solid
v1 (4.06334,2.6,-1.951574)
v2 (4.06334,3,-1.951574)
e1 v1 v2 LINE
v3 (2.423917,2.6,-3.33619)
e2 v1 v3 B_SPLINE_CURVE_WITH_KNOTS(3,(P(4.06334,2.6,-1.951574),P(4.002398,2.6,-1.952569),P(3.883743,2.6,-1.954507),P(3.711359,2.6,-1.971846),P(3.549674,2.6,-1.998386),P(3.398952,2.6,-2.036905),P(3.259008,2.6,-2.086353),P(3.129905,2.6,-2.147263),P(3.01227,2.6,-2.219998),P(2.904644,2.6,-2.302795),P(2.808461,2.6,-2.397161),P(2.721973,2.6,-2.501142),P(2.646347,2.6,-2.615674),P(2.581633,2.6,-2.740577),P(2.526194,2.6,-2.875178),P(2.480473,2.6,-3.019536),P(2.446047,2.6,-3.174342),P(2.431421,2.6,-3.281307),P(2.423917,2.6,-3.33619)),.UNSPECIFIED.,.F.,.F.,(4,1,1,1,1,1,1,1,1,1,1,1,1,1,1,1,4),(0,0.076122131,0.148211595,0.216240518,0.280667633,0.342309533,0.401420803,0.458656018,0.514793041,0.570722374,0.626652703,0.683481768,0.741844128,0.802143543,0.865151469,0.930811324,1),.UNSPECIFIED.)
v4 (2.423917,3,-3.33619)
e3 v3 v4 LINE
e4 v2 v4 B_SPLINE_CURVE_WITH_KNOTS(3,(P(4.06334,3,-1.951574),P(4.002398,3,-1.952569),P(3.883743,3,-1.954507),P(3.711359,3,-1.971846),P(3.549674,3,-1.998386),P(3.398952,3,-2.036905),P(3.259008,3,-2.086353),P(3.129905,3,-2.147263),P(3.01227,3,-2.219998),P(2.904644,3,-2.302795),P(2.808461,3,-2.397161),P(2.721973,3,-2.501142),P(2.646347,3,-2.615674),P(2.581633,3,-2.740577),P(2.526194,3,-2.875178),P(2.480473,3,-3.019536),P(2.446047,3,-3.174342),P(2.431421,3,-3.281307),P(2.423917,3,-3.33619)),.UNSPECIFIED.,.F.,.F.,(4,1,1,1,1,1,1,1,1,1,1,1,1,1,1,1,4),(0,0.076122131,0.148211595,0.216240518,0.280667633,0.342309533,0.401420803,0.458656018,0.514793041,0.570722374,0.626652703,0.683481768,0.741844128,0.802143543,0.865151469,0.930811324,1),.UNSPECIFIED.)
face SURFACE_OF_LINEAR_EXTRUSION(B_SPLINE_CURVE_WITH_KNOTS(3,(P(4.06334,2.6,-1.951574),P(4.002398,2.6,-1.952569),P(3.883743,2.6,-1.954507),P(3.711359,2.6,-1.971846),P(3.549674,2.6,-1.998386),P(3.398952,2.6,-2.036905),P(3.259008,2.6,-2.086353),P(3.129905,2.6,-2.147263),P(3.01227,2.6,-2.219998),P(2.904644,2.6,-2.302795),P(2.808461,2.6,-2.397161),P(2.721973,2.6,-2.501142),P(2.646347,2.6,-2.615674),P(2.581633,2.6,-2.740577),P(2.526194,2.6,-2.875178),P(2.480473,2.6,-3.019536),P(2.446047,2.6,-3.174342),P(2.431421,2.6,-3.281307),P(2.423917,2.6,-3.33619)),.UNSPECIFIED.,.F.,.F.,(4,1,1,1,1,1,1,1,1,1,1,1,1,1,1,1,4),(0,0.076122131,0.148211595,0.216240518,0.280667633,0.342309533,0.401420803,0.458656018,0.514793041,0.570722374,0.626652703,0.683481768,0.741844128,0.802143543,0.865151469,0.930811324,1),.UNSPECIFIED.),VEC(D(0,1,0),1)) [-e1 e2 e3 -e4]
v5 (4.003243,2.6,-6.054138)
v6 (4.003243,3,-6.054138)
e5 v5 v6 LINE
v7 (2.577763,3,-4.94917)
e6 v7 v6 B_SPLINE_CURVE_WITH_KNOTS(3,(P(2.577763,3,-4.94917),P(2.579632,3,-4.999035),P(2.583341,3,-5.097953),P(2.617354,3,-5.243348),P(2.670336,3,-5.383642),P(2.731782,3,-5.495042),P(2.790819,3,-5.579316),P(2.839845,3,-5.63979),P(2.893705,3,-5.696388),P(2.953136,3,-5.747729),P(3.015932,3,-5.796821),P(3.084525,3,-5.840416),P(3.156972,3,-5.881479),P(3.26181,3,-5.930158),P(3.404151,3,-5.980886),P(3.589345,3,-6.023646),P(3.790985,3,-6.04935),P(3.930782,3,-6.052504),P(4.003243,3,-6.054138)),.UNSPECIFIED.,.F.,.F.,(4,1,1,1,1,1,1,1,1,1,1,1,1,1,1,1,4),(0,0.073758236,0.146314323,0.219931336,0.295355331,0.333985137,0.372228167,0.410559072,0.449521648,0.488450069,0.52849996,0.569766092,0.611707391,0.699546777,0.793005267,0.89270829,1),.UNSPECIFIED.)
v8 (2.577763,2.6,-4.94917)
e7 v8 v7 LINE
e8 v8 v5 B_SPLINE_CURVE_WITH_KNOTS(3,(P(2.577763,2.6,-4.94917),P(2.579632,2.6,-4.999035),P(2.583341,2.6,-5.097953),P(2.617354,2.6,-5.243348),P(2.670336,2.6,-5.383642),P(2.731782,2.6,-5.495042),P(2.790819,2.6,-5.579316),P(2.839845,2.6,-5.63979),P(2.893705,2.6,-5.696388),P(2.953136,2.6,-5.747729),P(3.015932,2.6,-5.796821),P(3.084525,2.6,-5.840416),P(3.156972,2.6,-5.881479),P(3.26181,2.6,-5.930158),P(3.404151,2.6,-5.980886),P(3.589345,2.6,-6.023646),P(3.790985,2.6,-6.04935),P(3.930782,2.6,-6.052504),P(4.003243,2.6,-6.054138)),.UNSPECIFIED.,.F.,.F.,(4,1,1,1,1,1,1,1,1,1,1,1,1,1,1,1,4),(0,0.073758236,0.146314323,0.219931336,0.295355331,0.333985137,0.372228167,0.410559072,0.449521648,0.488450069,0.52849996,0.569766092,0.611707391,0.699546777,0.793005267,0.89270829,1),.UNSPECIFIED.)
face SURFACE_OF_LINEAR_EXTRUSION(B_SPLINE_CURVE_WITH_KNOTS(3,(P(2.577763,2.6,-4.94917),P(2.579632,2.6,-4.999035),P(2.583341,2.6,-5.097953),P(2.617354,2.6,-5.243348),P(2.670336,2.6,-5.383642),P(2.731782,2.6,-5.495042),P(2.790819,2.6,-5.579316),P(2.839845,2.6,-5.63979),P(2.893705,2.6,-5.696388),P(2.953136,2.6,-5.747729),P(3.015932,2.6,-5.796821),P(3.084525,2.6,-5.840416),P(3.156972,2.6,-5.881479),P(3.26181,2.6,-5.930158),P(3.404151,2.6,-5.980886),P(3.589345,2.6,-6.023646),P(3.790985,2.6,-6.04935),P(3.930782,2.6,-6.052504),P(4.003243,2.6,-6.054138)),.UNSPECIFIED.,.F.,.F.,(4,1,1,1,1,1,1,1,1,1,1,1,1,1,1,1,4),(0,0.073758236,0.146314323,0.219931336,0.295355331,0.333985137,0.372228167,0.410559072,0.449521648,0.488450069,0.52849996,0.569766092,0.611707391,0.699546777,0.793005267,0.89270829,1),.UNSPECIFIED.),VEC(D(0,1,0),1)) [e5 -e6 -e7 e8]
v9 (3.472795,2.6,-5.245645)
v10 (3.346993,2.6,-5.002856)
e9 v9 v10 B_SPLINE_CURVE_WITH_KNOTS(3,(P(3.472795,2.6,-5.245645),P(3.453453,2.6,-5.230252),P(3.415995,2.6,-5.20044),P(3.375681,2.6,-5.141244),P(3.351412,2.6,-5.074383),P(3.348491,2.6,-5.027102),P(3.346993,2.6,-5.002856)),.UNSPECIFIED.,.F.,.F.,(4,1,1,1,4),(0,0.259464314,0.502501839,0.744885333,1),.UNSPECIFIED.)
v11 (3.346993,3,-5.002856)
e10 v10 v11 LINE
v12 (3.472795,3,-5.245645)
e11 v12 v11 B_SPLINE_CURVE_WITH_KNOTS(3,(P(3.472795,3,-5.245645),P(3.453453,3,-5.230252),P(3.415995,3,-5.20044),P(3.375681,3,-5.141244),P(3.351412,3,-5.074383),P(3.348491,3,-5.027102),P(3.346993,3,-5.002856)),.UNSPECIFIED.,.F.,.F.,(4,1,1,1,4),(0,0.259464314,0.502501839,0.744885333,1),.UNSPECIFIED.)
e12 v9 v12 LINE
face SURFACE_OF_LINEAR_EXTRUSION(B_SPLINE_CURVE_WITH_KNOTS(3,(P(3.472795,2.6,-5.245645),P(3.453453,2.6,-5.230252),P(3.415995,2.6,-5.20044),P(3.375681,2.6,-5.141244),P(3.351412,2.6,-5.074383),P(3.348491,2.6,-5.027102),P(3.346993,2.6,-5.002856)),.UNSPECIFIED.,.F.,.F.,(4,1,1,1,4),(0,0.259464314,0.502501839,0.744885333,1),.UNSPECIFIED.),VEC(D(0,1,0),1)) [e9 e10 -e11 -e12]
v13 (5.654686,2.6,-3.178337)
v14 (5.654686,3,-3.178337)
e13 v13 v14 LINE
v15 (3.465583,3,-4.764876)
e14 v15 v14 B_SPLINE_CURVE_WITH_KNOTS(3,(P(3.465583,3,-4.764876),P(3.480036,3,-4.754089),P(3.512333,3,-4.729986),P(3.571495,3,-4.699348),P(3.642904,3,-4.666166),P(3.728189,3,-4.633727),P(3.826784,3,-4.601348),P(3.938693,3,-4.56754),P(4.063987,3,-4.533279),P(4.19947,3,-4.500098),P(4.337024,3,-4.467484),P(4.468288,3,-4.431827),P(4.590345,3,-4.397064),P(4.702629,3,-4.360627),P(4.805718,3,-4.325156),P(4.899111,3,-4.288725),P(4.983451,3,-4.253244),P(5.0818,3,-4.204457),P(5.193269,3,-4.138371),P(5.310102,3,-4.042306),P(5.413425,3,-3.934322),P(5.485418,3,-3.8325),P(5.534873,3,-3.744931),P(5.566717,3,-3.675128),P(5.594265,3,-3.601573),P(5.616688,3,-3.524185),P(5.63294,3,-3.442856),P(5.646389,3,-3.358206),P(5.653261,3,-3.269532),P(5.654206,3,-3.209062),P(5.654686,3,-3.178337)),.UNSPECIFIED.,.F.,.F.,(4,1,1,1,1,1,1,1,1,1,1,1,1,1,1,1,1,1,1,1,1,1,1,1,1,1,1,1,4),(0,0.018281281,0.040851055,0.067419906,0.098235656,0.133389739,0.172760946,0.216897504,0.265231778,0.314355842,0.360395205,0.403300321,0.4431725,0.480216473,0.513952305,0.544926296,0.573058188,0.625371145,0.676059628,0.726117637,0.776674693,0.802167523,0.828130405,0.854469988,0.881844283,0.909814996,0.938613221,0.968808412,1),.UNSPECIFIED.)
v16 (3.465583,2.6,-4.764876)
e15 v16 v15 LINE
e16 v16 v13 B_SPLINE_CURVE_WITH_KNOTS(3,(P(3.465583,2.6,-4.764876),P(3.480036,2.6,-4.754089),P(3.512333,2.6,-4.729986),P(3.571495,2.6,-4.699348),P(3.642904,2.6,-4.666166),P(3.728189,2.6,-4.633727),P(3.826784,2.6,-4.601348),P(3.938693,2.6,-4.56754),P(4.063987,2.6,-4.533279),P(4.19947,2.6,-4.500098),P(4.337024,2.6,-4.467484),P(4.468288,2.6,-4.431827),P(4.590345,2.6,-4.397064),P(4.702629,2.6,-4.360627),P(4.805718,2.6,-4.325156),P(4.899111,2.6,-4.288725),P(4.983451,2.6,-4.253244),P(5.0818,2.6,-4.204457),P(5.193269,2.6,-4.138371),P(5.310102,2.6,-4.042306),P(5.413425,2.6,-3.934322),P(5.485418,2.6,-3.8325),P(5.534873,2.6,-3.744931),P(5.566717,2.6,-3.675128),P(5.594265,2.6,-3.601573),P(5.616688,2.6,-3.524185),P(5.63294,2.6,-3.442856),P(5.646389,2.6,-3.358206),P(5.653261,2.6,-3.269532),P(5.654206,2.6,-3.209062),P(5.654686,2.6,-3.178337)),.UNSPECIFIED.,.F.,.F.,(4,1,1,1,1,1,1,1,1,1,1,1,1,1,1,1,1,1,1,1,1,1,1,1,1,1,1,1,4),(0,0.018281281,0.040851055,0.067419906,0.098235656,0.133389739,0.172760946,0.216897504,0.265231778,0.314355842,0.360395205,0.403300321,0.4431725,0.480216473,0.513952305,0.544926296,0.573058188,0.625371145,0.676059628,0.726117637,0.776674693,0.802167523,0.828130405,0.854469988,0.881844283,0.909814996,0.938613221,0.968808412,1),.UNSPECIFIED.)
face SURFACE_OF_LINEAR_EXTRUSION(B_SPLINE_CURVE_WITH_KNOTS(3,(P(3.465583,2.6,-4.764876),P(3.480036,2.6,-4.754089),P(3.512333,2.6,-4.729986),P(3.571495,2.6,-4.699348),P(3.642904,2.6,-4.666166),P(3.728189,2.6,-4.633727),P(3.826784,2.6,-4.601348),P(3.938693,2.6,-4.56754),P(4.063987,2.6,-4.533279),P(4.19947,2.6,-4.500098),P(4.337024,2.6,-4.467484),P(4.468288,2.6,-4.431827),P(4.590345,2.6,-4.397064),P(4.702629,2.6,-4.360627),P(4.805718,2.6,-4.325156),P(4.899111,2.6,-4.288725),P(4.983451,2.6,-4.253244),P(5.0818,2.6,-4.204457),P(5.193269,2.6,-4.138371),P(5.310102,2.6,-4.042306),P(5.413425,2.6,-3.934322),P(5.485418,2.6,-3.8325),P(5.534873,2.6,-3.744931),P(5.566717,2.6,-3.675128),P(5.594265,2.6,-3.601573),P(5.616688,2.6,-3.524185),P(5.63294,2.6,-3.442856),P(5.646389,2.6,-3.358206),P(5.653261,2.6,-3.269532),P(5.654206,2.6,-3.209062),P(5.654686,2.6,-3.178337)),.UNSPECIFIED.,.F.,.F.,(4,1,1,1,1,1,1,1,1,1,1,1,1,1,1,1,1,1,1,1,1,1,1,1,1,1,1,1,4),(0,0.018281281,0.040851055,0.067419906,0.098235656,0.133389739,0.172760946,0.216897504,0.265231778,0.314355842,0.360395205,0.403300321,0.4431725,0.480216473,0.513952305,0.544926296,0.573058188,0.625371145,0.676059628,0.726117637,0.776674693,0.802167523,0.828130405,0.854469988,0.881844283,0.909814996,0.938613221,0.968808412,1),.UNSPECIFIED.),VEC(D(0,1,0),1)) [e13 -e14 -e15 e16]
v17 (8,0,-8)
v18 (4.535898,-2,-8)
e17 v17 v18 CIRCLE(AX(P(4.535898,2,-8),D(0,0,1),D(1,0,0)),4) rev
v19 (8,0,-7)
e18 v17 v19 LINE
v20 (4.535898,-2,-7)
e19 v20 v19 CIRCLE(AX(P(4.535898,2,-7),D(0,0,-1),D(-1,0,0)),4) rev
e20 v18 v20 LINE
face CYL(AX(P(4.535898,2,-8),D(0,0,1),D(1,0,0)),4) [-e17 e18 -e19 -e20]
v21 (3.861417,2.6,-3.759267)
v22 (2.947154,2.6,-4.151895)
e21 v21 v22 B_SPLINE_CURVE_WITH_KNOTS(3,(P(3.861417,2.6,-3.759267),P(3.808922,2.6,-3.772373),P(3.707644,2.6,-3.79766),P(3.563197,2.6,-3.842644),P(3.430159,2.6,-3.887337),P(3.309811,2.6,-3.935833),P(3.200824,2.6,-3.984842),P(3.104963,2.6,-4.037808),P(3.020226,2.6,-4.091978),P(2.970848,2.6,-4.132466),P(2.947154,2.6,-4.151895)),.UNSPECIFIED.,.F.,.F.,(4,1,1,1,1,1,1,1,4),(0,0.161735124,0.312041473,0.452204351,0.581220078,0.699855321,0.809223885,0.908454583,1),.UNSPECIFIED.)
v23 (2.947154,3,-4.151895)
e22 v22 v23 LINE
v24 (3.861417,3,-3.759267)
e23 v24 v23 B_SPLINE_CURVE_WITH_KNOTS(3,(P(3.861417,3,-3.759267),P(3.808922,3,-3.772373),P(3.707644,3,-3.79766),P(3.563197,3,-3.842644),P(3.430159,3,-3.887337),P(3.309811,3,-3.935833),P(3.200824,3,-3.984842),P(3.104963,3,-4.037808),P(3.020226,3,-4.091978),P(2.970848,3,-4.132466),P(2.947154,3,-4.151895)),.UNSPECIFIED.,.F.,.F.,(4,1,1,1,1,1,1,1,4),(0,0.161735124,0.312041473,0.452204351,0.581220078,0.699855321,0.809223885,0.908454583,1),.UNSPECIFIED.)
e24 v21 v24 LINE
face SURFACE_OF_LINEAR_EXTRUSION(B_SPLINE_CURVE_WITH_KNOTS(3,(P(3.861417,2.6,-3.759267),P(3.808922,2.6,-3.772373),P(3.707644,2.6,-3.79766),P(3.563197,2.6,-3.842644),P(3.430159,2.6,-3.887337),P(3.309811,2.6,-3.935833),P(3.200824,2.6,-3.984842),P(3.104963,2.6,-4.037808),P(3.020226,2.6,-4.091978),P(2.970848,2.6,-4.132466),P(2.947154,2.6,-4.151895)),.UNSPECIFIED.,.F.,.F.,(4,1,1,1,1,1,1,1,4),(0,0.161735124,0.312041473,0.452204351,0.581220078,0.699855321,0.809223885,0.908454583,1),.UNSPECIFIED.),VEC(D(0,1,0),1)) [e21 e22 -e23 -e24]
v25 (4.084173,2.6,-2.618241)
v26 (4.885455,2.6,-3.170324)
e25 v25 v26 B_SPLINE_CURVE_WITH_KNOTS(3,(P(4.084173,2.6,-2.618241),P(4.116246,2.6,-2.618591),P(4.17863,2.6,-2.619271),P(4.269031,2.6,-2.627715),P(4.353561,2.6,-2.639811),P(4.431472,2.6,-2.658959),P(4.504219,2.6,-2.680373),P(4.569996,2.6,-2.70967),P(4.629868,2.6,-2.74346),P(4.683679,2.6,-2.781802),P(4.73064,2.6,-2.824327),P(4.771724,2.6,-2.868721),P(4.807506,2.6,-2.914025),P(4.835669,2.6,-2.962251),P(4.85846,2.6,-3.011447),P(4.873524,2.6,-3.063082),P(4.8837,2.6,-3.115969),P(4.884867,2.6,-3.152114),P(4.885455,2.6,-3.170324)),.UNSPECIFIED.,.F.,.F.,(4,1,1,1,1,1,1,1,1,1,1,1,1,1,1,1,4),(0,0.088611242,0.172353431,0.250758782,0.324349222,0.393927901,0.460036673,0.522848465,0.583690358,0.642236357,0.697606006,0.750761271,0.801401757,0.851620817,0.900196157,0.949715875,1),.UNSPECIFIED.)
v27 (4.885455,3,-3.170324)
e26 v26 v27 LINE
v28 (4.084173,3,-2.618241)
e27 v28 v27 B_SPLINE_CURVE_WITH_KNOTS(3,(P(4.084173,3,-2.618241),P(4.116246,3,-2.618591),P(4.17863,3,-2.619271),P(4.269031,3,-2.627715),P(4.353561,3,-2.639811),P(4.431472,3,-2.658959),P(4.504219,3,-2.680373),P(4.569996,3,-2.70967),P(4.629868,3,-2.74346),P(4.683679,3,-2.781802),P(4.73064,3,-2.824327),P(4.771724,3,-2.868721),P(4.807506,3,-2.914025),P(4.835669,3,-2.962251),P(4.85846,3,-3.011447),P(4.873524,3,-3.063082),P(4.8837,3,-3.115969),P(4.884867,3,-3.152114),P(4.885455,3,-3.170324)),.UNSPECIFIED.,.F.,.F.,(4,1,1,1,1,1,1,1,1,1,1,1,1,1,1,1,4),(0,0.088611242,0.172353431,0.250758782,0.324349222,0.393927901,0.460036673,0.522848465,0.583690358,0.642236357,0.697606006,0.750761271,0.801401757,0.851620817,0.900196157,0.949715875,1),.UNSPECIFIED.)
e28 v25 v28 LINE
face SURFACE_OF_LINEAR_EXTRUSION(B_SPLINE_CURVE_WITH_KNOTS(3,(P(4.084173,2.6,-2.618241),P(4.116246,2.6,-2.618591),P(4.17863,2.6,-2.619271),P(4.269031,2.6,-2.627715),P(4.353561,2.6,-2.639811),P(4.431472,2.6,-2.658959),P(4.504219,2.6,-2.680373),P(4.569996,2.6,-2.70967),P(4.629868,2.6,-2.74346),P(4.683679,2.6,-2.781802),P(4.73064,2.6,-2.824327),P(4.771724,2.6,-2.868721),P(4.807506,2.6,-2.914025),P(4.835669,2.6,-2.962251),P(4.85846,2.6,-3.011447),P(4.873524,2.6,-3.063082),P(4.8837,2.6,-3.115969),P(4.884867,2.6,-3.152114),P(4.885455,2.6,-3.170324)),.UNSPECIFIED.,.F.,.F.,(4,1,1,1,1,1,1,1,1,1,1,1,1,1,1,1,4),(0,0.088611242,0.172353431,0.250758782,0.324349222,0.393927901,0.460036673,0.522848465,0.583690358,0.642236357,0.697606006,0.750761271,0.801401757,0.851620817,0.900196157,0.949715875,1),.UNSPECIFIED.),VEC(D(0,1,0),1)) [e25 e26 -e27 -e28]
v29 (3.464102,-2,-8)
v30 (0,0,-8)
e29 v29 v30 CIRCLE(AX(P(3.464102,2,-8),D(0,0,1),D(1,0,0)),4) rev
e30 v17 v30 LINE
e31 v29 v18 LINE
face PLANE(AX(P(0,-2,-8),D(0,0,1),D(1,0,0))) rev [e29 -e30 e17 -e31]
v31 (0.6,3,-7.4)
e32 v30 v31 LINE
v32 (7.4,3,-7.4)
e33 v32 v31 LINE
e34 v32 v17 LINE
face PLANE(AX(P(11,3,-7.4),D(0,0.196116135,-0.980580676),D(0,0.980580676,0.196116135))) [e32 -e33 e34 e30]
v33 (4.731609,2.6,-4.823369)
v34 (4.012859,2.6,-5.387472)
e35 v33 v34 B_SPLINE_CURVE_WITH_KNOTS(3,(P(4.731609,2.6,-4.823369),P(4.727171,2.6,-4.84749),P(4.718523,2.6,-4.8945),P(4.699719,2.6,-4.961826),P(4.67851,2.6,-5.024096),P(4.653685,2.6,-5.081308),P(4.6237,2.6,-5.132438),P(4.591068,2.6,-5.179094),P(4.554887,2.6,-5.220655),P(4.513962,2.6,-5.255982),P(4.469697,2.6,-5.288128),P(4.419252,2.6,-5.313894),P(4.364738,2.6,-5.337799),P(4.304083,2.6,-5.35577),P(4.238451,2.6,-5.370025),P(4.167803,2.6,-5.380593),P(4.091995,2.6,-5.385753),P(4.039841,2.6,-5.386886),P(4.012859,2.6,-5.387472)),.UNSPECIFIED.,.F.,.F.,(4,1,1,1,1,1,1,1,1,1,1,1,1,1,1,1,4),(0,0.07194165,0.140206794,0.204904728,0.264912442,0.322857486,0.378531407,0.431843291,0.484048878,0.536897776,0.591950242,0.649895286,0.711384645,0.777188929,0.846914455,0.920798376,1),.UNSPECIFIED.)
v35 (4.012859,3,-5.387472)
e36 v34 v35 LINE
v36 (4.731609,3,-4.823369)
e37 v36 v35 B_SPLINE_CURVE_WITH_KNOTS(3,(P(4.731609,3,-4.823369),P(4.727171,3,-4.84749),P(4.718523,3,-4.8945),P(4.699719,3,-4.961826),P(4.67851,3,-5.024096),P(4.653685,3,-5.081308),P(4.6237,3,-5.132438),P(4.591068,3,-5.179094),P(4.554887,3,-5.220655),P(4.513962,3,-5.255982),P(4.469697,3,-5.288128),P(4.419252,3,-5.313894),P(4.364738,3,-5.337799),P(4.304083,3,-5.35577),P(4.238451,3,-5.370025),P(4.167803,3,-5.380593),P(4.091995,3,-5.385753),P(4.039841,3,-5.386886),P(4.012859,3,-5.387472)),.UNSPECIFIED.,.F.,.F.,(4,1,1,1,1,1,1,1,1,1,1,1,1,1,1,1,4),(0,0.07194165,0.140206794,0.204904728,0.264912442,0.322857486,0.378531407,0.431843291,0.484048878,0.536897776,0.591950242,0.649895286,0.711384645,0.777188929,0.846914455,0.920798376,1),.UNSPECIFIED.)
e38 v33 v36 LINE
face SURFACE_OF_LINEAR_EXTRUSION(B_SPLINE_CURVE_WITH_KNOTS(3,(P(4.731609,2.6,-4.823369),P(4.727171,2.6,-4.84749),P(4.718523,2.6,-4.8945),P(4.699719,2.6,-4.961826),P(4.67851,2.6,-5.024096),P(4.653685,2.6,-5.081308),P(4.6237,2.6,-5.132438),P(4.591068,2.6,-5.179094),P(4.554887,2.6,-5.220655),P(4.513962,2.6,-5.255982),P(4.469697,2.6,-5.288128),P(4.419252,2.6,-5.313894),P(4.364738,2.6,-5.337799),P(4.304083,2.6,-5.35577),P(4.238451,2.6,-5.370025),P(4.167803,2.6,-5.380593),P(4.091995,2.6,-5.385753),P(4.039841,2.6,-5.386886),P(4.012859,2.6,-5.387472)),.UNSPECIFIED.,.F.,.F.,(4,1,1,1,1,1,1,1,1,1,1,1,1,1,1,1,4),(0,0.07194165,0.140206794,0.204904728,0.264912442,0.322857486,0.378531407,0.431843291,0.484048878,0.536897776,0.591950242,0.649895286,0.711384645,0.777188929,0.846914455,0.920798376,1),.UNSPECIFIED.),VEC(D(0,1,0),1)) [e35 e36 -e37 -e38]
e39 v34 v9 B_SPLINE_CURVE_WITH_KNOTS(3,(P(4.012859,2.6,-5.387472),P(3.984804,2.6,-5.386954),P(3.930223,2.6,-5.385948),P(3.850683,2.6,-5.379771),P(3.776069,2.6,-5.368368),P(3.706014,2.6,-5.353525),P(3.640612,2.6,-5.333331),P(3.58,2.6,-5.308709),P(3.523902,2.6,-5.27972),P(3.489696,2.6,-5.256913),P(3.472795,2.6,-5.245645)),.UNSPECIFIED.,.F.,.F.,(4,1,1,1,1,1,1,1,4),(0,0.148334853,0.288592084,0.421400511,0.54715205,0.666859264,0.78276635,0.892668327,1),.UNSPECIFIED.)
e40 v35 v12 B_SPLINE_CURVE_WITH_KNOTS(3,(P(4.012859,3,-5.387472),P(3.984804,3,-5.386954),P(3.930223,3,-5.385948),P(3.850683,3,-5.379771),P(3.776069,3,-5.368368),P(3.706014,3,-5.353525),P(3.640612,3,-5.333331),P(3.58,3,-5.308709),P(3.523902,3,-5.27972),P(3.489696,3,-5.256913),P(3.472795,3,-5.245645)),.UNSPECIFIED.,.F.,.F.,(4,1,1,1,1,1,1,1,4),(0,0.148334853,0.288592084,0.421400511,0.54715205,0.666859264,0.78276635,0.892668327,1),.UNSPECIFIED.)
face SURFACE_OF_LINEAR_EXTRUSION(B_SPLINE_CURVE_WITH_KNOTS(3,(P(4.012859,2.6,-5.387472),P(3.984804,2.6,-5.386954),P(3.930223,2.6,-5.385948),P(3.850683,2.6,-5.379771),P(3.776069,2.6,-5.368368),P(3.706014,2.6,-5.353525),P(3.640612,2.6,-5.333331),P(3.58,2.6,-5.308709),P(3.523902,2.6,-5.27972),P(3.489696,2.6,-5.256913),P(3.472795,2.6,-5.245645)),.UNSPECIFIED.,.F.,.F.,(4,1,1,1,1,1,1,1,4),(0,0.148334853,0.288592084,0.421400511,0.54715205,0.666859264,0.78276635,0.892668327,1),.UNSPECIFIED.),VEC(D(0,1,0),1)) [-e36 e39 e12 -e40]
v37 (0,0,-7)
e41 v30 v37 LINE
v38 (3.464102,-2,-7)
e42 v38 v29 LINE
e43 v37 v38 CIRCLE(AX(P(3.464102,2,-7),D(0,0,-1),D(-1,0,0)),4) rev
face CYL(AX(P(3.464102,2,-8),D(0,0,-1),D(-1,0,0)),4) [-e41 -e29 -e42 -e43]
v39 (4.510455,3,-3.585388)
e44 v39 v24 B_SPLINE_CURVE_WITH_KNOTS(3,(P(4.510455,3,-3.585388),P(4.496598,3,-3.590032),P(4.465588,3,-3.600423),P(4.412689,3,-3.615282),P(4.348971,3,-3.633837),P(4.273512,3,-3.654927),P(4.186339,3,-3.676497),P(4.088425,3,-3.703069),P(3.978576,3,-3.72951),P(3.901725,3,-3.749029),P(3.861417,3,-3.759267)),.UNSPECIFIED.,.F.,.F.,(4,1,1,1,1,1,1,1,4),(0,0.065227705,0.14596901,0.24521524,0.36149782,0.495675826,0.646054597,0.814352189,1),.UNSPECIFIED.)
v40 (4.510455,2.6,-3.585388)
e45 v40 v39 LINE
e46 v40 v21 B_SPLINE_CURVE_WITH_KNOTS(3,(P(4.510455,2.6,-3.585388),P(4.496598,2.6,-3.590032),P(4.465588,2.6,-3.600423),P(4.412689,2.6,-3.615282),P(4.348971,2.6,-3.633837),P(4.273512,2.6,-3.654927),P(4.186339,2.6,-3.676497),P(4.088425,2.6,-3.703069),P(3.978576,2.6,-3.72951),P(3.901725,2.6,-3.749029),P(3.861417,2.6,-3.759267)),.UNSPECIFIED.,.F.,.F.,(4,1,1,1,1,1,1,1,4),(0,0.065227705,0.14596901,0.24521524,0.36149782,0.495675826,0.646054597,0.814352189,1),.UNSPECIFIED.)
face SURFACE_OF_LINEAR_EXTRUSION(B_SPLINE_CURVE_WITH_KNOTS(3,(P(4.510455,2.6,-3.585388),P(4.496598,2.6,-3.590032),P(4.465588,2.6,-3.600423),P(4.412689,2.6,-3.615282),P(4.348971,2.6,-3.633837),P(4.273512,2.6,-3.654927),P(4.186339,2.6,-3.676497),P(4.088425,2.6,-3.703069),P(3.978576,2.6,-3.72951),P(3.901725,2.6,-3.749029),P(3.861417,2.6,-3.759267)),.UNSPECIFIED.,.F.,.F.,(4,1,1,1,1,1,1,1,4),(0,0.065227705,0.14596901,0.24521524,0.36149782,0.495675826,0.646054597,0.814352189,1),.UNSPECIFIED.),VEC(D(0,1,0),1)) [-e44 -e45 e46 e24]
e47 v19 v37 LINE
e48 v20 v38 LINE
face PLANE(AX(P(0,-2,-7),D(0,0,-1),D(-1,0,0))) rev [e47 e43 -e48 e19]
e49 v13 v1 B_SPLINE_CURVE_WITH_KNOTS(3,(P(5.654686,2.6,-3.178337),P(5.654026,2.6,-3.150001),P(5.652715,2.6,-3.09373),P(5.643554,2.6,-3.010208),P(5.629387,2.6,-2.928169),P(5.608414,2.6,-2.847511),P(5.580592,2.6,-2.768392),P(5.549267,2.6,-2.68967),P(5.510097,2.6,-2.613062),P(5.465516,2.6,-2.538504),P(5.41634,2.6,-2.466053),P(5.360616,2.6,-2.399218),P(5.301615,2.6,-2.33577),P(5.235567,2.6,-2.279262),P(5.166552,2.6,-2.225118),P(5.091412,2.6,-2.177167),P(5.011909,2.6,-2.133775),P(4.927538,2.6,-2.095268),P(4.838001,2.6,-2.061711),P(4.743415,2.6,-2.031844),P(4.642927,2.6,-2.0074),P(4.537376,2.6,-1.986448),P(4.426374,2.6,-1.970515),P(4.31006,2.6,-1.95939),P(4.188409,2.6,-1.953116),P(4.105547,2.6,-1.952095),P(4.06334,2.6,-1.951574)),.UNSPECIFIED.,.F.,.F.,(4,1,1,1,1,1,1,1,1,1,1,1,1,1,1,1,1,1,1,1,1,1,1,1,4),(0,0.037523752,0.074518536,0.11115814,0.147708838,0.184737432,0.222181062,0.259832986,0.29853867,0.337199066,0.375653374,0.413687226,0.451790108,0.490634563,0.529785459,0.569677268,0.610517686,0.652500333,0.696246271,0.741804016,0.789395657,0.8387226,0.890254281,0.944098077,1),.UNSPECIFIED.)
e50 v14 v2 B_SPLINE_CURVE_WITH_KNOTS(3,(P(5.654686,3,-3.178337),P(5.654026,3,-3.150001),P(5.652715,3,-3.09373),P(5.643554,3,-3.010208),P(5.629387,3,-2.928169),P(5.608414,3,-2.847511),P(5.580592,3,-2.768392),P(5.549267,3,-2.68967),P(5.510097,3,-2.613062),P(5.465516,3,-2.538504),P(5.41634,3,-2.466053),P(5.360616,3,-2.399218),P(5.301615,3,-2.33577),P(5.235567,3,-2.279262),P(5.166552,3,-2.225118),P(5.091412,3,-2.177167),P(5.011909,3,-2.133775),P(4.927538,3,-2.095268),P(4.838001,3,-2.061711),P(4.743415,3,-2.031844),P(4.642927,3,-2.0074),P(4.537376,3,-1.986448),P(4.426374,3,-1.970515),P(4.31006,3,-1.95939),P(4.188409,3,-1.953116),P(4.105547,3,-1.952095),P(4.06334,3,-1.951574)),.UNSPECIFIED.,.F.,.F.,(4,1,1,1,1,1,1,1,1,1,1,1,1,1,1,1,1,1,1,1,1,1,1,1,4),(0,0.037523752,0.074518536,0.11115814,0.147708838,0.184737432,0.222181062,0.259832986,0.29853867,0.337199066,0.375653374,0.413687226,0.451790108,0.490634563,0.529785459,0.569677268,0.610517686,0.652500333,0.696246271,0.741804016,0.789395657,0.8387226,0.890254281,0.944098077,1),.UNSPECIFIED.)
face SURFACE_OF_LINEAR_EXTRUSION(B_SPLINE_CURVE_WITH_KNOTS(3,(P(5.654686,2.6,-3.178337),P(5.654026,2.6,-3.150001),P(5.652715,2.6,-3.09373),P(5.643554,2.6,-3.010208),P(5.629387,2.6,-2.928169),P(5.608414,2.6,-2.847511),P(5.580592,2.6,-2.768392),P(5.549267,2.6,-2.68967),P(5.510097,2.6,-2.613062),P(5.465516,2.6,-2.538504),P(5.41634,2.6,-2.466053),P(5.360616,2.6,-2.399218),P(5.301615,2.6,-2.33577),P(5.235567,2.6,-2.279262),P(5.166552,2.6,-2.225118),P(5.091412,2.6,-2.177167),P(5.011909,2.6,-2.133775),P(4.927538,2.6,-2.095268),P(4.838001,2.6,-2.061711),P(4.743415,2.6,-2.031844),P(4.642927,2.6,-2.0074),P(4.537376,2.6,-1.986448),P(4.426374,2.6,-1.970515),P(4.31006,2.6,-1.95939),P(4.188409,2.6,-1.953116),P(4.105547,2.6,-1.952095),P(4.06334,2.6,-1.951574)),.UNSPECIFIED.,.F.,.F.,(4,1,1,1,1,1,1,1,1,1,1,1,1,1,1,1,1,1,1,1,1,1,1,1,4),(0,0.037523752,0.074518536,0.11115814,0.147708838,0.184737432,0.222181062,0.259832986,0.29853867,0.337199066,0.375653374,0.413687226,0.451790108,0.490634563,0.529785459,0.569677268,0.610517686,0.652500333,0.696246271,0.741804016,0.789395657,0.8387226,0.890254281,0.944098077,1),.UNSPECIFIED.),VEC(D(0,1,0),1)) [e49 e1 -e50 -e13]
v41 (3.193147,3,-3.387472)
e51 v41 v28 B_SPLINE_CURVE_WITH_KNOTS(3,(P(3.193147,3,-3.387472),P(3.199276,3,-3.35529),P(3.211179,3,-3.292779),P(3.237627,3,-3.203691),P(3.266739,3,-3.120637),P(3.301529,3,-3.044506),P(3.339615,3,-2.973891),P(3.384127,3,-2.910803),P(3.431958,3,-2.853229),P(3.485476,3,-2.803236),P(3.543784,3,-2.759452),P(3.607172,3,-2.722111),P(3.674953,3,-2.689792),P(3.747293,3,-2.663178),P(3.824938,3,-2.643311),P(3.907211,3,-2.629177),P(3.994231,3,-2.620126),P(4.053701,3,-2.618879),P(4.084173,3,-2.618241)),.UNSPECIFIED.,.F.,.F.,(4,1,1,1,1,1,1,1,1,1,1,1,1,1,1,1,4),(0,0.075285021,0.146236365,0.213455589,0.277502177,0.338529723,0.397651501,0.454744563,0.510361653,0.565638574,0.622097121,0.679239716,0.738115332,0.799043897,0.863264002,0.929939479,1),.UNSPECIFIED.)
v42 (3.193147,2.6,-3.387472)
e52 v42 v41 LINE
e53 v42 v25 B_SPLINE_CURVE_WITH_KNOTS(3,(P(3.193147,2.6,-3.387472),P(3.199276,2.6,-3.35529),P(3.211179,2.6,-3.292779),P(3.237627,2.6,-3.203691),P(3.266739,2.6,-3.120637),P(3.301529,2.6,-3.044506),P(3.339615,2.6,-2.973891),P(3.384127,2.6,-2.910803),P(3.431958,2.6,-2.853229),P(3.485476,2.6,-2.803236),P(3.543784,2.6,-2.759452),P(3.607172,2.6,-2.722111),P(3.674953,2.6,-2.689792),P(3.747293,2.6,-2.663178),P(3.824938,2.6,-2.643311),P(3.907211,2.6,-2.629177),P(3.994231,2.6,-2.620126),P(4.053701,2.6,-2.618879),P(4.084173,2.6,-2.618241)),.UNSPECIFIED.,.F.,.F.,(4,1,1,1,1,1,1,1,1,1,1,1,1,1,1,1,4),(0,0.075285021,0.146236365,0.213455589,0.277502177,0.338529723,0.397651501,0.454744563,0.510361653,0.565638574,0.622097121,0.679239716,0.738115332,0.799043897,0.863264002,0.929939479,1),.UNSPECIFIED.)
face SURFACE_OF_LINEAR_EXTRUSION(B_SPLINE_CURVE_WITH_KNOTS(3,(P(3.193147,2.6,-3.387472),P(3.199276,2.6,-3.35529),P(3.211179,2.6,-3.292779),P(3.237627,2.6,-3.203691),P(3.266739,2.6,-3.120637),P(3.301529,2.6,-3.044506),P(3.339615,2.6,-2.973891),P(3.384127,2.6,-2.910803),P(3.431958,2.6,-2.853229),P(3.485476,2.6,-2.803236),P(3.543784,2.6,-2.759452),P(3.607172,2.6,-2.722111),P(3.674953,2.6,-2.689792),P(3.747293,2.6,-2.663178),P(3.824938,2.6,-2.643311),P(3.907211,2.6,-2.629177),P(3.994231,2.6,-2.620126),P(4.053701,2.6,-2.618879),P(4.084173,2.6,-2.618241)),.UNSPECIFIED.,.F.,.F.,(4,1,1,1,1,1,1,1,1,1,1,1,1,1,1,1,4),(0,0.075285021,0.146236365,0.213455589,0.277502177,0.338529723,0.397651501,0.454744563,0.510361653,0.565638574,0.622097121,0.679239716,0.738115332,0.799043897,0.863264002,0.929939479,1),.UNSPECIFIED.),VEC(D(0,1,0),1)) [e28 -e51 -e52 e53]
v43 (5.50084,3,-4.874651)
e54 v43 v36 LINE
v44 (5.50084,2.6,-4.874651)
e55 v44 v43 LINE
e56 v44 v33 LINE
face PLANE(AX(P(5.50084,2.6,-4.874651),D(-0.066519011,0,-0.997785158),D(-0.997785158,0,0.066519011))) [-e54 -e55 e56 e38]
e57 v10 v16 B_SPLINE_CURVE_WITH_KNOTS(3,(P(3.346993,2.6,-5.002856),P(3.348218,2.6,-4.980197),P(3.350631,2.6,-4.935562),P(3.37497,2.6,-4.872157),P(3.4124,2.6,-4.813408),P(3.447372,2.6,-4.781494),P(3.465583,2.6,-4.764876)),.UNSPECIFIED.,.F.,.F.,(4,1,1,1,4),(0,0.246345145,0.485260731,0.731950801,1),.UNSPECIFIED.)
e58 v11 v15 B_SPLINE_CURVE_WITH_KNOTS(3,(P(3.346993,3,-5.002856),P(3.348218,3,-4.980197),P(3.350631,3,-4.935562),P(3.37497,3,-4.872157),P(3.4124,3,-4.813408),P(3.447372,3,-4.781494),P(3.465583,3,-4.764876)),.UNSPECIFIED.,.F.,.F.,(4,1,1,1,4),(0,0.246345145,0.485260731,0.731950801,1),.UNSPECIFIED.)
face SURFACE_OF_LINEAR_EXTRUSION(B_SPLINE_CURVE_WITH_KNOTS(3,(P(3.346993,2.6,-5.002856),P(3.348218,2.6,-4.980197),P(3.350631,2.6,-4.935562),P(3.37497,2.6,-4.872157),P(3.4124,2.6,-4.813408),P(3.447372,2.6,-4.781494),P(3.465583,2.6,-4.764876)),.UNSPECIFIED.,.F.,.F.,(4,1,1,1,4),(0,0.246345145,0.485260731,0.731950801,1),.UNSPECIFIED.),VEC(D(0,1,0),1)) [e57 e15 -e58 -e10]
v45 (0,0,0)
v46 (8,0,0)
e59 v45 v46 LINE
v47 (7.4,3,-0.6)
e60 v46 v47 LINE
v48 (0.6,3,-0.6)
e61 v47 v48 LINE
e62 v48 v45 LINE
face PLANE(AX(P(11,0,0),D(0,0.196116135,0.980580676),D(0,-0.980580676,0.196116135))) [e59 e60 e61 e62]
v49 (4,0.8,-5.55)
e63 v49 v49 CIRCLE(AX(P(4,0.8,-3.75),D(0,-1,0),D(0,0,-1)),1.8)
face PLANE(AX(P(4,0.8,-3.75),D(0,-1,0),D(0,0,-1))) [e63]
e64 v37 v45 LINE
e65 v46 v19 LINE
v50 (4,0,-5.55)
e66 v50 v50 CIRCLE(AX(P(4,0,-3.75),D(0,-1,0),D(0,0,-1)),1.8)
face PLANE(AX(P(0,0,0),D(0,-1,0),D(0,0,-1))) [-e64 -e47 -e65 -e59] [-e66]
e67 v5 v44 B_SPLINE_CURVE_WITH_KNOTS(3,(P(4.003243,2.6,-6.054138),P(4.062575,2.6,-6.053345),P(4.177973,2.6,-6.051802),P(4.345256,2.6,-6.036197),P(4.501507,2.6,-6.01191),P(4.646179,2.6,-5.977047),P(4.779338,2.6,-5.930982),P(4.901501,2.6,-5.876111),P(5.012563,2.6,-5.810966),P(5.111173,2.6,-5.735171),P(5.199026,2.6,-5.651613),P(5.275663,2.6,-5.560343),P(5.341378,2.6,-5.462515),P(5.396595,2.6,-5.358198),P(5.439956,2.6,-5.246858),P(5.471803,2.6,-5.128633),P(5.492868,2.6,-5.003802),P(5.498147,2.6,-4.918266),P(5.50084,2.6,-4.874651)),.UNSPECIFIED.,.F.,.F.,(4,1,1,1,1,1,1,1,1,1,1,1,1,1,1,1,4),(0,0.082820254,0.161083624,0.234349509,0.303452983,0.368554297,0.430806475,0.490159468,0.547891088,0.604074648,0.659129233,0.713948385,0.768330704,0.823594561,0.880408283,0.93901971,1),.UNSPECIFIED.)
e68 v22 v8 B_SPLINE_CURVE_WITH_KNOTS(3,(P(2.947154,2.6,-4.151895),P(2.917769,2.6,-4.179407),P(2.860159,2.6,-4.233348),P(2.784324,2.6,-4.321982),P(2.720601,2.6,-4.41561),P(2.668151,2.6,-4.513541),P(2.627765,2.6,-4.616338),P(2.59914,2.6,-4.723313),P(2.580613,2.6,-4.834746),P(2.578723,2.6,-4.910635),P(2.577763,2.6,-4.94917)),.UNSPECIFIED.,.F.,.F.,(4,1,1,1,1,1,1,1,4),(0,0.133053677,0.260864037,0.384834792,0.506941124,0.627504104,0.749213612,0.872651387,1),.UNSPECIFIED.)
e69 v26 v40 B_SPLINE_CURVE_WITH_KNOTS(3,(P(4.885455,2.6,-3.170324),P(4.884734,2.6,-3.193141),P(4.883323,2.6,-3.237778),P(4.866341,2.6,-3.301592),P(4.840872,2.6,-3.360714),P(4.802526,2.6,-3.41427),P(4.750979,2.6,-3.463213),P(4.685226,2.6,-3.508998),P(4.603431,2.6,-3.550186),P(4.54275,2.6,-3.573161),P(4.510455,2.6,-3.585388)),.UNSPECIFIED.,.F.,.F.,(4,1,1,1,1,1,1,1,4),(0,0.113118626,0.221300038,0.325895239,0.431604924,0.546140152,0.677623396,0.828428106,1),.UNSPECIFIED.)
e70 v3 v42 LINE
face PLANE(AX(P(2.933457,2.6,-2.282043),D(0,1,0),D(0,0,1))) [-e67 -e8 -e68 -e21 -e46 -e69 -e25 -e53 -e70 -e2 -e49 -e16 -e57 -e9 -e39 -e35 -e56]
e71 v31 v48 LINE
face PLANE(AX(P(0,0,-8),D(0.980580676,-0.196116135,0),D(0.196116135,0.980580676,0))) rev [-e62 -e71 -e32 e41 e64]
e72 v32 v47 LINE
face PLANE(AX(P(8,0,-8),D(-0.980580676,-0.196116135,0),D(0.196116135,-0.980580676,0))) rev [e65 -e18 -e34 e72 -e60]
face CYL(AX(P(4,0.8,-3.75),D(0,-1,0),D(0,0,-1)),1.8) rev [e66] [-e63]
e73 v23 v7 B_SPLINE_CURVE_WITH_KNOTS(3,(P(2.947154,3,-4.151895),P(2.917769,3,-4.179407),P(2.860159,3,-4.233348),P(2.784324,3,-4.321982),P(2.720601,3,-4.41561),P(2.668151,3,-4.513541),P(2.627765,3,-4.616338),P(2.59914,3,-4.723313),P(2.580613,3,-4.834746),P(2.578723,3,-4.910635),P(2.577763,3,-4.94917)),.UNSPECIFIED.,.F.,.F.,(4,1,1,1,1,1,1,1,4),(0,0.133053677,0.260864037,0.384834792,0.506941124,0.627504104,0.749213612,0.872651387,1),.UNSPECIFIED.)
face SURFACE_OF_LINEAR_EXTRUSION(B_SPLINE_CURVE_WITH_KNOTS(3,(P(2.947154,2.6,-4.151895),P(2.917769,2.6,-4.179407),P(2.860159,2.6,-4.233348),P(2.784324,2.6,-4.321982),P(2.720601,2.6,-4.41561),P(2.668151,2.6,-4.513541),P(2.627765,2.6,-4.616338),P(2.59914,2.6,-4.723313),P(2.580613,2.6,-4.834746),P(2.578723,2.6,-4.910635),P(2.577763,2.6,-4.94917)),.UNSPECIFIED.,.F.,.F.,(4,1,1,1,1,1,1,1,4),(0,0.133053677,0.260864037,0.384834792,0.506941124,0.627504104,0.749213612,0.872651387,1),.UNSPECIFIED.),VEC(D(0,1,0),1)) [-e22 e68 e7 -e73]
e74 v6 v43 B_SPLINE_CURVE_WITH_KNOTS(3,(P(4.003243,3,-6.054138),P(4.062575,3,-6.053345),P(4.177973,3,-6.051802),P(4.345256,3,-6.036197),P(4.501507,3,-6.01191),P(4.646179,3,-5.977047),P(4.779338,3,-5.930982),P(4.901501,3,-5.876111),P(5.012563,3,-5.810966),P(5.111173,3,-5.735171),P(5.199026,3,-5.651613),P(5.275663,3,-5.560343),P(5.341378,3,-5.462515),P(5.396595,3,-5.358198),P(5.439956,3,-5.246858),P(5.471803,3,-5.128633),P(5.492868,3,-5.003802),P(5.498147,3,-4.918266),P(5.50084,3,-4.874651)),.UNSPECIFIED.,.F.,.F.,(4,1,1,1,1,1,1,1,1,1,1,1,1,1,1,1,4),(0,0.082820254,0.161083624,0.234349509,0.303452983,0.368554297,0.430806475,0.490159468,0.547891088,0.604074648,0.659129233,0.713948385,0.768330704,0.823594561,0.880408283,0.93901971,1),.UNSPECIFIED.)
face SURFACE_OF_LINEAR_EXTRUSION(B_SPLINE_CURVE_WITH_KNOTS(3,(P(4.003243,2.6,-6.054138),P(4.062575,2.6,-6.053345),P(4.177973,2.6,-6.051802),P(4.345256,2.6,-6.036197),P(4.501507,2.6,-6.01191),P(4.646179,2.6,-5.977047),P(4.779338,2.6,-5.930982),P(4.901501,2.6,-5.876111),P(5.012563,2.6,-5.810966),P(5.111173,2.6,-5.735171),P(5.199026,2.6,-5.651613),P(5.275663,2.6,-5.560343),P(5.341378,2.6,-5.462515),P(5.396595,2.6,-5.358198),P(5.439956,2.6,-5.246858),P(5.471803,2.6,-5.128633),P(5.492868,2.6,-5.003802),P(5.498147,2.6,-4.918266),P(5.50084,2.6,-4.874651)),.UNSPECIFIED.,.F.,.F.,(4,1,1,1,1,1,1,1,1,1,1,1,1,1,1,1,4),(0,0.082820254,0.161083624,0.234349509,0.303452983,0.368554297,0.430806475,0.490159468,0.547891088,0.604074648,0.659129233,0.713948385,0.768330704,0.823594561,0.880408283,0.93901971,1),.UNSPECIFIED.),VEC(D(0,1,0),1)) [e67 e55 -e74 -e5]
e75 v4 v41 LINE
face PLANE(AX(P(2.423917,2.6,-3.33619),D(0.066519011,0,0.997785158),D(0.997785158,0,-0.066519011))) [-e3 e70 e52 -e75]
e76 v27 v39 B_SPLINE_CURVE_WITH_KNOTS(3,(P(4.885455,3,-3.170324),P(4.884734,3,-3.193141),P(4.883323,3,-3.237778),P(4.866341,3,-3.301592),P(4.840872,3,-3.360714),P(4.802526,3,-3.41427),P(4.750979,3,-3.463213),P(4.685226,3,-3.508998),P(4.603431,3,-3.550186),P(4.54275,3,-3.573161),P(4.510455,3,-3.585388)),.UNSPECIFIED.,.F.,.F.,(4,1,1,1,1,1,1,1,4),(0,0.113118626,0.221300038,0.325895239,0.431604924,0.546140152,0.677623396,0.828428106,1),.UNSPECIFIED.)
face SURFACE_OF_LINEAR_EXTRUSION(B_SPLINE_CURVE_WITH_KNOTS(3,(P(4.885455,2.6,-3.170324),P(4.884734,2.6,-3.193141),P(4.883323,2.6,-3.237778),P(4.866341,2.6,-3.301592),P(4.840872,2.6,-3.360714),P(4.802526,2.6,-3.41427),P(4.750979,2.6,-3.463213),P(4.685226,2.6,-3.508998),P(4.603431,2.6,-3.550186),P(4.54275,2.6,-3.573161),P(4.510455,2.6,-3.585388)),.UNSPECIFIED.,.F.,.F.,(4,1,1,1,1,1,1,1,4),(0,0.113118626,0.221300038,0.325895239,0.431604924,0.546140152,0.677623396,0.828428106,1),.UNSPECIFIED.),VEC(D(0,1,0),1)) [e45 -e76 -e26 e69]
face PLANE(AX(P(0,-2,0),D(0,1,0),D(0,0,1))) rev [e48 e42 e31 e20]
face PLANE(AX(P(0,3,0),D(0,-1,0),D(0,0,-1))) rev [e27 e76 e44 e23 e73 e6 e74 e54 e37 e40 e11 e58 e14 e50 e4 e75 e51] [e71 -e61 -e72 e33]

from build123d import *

# Parameters (mm, degrees)
SKETCH1_W               = 8
SKETCH1_H               = 8
BOSS_EXTRUDE1_DEPTH     = 3
CUT_EXTRUDE1_DEPTH      = 12.704699911
CUT_EXTRUDE1_DEPTH_BACK = 12.704699911
CUT_EXTRUDE2_DEPTH      = 11
SKETCH4_R               = 1.8
CUT_EXTRUDE3_DEPTH      = 0.8
SKETCH5_W               = 8
SKETCH5_H               = 1
BOSS_EXTRUDE2_DEPTH     = 2
FILLET1_R               = 4
CUT_EXTRUDE4_DEPTH      = 0.4


with BuildPart() as part:
    # Sketch1 → Boss-Extrude1 (new body)
    with BuildSketch(Plane(origin=(0, 0, 0), x_dir=(1, 0, 0), z_dir=(0, 1, 0))):
        with Locations((4, 4)):
            Rectangle(SKETCH1_W, SKETCH1_H)
    extrude(amount=BOSS_EXTRUDE1_DEPTH)

    # Sketch2 → Cut-Extrude1 (cut, two sides: drawn at the far end of the back side and taken through both)
    with BuildSketch(Plane.XY.offset(-CUT_EXTRUDE1_DEPTH_BACK)):
        Polygon((0, 0), (0.6, 3), (0, 3), align=None)
        Polygon((8, 0), (7.4, 3), (8, 3), align=None)
    extrude(amount=CUT_EXTRUDE1_DEPTH + CUT_EXTRUDE1_DEPTH_BACK, mode=Mode.SUBTRACT)

    # Sketch3 → Cut-Extrude2 (cut)
    with BuildSketch(Plane(origin=(0, 0, 0), x_dir=(0, 0, -1), z_dir=(1, 0, 0))):
        Polygon((0, 0), (0.6, 3), (0, 3), align=None)
        Polygon((8, 3), (7.4, 3), (8, 0), align=None)
    extrude(amount=CUT_EXTRUDE2_DEPTH, mode=Mode.SUBTRACT)

    # Sketch4 → Cut-Extrude3 (cut)
    with BuildSketch(Plane.XZ):
        with Locations(Location((4, -3.75, 0), (0, 0, 270))):
            Circle(SKETCH4_R)
    extrude(amount=-CUT_EXTRUDE3_DEPTH, mode=Mode.SUBTRACT)

    # Sketch5 → Boss-Extrude2 (add)
    with BuildSketch(Plane.XZ):
        with Locations((4, -7.5)):
            Rectangle(SKETCH5_W, SKETCH5_H)
    extrude(amount=BOSS_EXTRUDE2_DEPTH)

    # Fillet1
    # the kernel refuses this fillet: 4 mm, written as the material it takes off along each edge
    with BuildSketch(Plane(origin=(8, -2, -16.660254038), x_dir=(0, 1, 0), z_dir=(0, 0, 1)), Plane(origin=(0, -2, 1.660254038), x_dir=(0, 1, 0), z_dir=(0, 0, -1))) as fillet1_piece_1:
        with BuildLine():
            CenterArc((4, 3.464101615), FILLET1_R, 180, 60)
            Line((0, 3.464101615), (-0.08, 3.464101615))
            Line((-0.08, 3.464101615), (-0.08, 0))
            Line((-0.08, 0), (0, -0.08))
            ThreePointArc((0, -0.08), (1, -0.08), (1.96, -0.069282032))
            Line((1.96, -0.069282032), (2, 0))
        make_face()
    extrude(amount=18.320508076, mode=Mode.SUBTRACT)

    # Sketch6 → Cut-Extrude4 (cut)
    with BuildSketch(Plane(origin=(0, 3, 0), x_dir=(1, 0, 0), z_dir=(0, 1, 0))):
        with BuildLine():
            Line((2.423916505, 3.336189685), (3.193147274, 3.387471736))
            add(Edge.make_bspline(
                [(3.193147274, 3.387471736), (3.199275518, 3.35528983), (3.211179242, 3.292778523), (3.237627081, 3.203691377), (3.266738832, 3.12063689), (3.30152897, 3.044505684), (3.339615284, 2.973890515), (3.38412658, 2.910803039), (3.431957638, 2.853229033), (3.485476185, 2.803236311), (3.543783948, 2.759451994), (3.607171876, 2.722111271), (3.674953108, 2.6897922), (3.747293374, 2.663178469), (3.824938253, 2.64331119), (3.907211345, 2.629176798), (3.994230643, 2.620125524), (4.053701404, 2.618879435), (4.084172915, 2.618240967)],
                knots=[0, 0, 0, 0, 1.204560339, 2.339781841, 3.415289417, 4.440034832, 5.416475564, 6.362424008, 7.275913008, 8.16578645, 9.05021719, 9.95355393, 10.867835453, 11.809845306, 12.784702352, 13.812224031, 14.87903166, 16, 16, 16, 16], degree=3))
            add(Edge.make_bspline(
                [(4.084172915, 2.618240967), (4.116246108, 2.618590883), (4.178630121, 2.619271489), (4.269031453, 2.627715), (4.353560804, 2.639811238), (4.431471751, 2.6589593), (4.504219207, 2.680373377), (4.569996427, 2.709670116), (4.629867843, 2.743459668), (4.683679212, 2.781802056), (4.730640445, 2.824326515), (4.771724475, 2.86872067), (4.807505951, 2.914025405), (4.835668504, 2.962251146), (4.858460082, 3.011447443), (4.873523718, 3.063081907), (4.883700097, 3.1159689), (4.884867031, 3.152113555), (4.885454967, 3.1703243)],
                knots=[0, 0, 0, 0, 1.417779877, 2.757654889, 4.012140507, 5.189587551, 6.302846416, 7.360586765, 8.365575446, 9.33904572, 10.275781718, 11.161696098, 12.012180333, 12.822428111, 13.625933072, 14.403138519, 15.195454004, 16, 16, 16, 16], degree=3))
            add(Edge.make_bspline(
                [(4.885454967, 3.1703243), (4.884733913, 3.193140887), (4.883323278, 3.237778199), (4.866340641, 3.301592127), (4.840872442, 3.360713887), (4.802526135, 3.41427025), (4.750979261, 3.463212961), (4.685226085, 3.508997669), (4.603431212, 3.550186), (4.542750055, 3.573160928), (4.510454967, 3.585388403)],
                knots=[0, 0, 0, 0, 0.90494901, 1.770400303, 2.607161909, 3.452839393, 4.36912122, 5.420987164, 6.627424851, 8, 8, 8, 8], degree=3))
            add(Edge.make_bspline(
                [(4.510454967, 3.585388403), (4.496597999, 3.590031937), (4.465588357, 3.600423411), (4.4126892, 3.615282239), (4.348970759, 3.633836968), (4.273512264, 3.654927379), (4.186339087, 3.676497317), (4.088424838, 3.703069034), (3.978575834, 3.729510064), (3.901725338, 3.749028827), (3.861416505, 3.759266608)],
                knots=[0, 0, 0, 0, 0.521821638, 1.167752076, 1.961721917, 2.891982557, 3.96540661, 5.168436773, 6.514817513, 8, 8, 8, 8], degree=3))
            add(Edge.make_bspline(
                [(3.861416505, 3.759266608), (3.808922441, 3.772373151), (3.707643728, 3.797660082), (3.563197092, 3.84264374), (3.430159098, 3.887337495), (3.309810688, 3.935832618), (3.200824367, 3.984842463), (3.104963023, 4.037807847), (3.02022624, 4.091978089), (2.970848149, 4.132466251), (2.947153685, 4.151894813)],
                knots=[0, 0, 0, 0, 1.293880989, 2.496331788, 3.617634808, 4.64976062, 5.598842568, 6.473791081, 7.267636666, 8, 8, 8, 8], degree=3))
            add(Edge.make_bspline(
                [(2.947153685, 4.151894813), (2.917769469, 4.179407128), (2.860158996, 4.233347566), (2.784323751, 4.321982057), (2.720601495, 4.415610216), (2.668151102, 4.513540942), (2.627765291, 4.616338017), (2.599140348, 4.723313361), (2.580613245, 4.834746169), (2.578722682, 4.91063455), (2.577762659, 4.949170454)],
                knots=[0, 0, 0, 0, 1.064429417, 2.086912298, 3.078678339, 4.055528992, 5.020032834, 5.993708893, 6.981211098, 8, 8, 8, 8], degree=3))
            add(Edge.make_bspline(
                [(2.577762659, 4.949170454), (2.579632311, 4.999035454), (2.583341142, 5.097952729), (2.617353538, 5.24334762), (2.670335558, 5.383642492), (2.731782138, 5.495041815), (2.790819043, 5.579315825), (2.839844896, 5.639790083), (2.893704531, 5.696388175), (2.953135712, 5.747729494), (3.015931612, 5.796821395), (3.084525186, 5.840415592), (3.156971597, 5.881478913), (3.261809808, 5.93015757), (3.404151332, 5.980885512), (3.589345301, 6.023645948), (3.790984862, 6.049350493), (3.930782191, 6.052503897), (4.003243428, 6.054138403)],
                knots=[0, 0, 0, 0, 1.180131776, 2.341029169, 3.518901375, 4.725685298, 5.343762192, 5.955650671, 6.568945152, 7.192346361, 7.815201106, 8.455999361, 9.116257477, 9.787318263, 11.192748436, 12.688084276, 14.283332633, 16, 16, 16, 16], degree=3))
            add(Edge.make_bspline(
                [(4.003243428, 6.054138403), (4.062574751, 6.053344994), (4.177972905, 6.051801831), (4.345255933, 6.036197125), (4.501507358, 6.011910245), (4.646178875, 5.977046542), (4.779337891, 5.930982439), (4.901500568, 5.876111383), (5.012563098, 5.81096567), (5.111173405, 5.735171454), (5.199025737, 5.651613191), (5.275662846, 5.560343317), (5.341377732, 5.462514514), (5.396594511, 5.358198276), (5.439956101, 5.246858263), (5.471803478, 5.128633406), (5.492867609, 5.003801978), (5.498147397, 4.918266237), (5.500839582, 4.874651223)],
                knots=[0, 0, 0, 0, 1.325124071, 2.577337985, 3.749592149, 4.855247722, 5.896868755, 6.892903601, 7.842551483, 8.766257401, 9.665194363, 10.546067736, 11.423174165, 12.293291263, 13.177512979, 14.086532529, 15.024315359, 16, 16, 16, 16], degree=3))
            Line((5.500839582, 4.874651223), (4.731608813, 4.823369172))
            add(Edge.make_bspline(
                [(4.731608813, 4.823369172), (4.727171315, 4.847490186), (4.718523093, 4.894499533), (4.699719489, 4.96182647), (4.678509937, 5.024096207), (4.653685255, 5.081308344), (4.623700039, 5.13243816), (4.591067506, 5.179094223), (4.554887475, 5.220654869), (4.51396201, 5.255982033), (4.469697485, 5.288128305), (4.419251527, 5.313894286), (4.364737876, 5.337799444), (4.30408262, 5.355770261), (4.238450559, 5.370025359), (4.167803464, 5.380593162), (4.091994892, 5.385752959), (4.039841388, 5.386885694), (4.012858813, 5.387471736)],
                knots=[0, 0, 0, 0, 1.151066407, 2.24330871, 3.278475654, 4.238599069, 5.165719782, 6.056502506, 6.909492653, 7.744782051, 8.590364415, 9.471203867, 10.39832458, 11.382154319, 12.435022857, 13.550631277, 14.73277401, 16, 16, 16, 16], degree=3))
            add(Edge.make_bspline(
                [(4.012858813, 5.387471736), (3.984804304, 5.386954358), (3.930223002, 5.385947775), (3.850683499, 5.379770524), (3.776069477, 5.368367912), (3.706014485, 5.353524542), (3.640612102, 5.333331162), (3.580000346, 5.308708643), (3.523901913, 5.279720359), (3.489695535, 5.256913378), (3.47279471, 5.245644813)],
                knots=[0, 0, 0, 0, 1.186678824, 2.308736671, 3.37120409, 4.377216403, 5.334874112, 6.262130804, 7.141346615, 8, 8, 8, 8], degree=3))
            add(Edge.make_bspline(
                [(3.47279471, 5.245644813), (3.453453136, 5.230251633), (3.415994509, 5.200439822), (3.3756811, 5.141243702), (3.351412335, 5.074383458), (3.348491314, 5.027102037), (3.346993428, 5.002856352)],
                knots=[0, 0, 0, 0, 1.037857257, 2.010007357, 2.979541333, 4, 4, 4, 4], degree=3))
            add(Edge.make_bspline(
                [(3.346993428, 5.002856352), (3.348218426, 4.980197149), (3.350631475, 4.935562125), (3.374970191, 4.872157107), (3.41239982, 4.813407798), (3.447371668, 4.781494404), (3.465583172, 4.764875582)],
                knots=[0, 0, 0, 0, 0.98538058, 1.941042925, 2.927803204, 4, 4, 4, 4], degree=3))
            add(Edge.make_bspline(
                [(3.465583172, 4.764875582), (3.480036346, 4.754089134), (3.512333176, 4.72998591), (3.571494566, 4.699348433), (3.642903916, 4.666166195), (3.728189187, 4.633726893), (3.826783574, 4.601347807), (3.938693075, 4.567540299), (4.063986517, 4.533278892), (4.199470233, 4.500098399), (4.337024364, 4.467483879), (4.46828848, 4.431827004), (4.590345232, 4.397064309), (4.702628677, 4.360627363), (4.805717615, 4.325156109), (4.899111277, 4.288724577), (4.98345094, 4.253244341), (5.081800337, 4.204456503), (5.193269487, 4.138371404), (5.310101731, 4.042305693), (5.413424942, 3.934321559), (5.485417809, 3.83249997), (5.534873142, 3.744930694), (5.566717158, 3.675127784), (5.59426473, 3.601573118), (5.616688379, 3.524185412), (5.632940128, 3.442855773), (5.646389397, 3.358205559), (5.653260877, 3.269531733), (5.654205671, 3.209062493), (5.654685736, 3.178337121)],
                knots=[0, 0, 0, 0, 0.511875881, 1.143829537, 1.88775736, 2.750598373, 3.734912702, 4.837306479, 6.073130119, 7.42648979, 8.801963576, 10.091065733, 11.292408984, 12.408830014, 13.446061236, 14.39066453, 15.257936293, 16.045629259, 17.510392066, 18.929669597, 20.331293837, 21.746891395, 22.460690638, 23.187651344, 23.925159671, 24.69163991, 25.474819891, 26.281170188, 27.126635539, 28, 28, 28, 28], degree=3))
            add(Edge.make_bspline(
                [(5.654685736, 3.178337121), (5.654025632, 3.150001459), (5.652714728, 3.093729578), (5.643553782, 3.010207902), (5.629386607, 2.928169417), (5.608414322, 2.847511277), (5.580592445, 2.768392154), (5.549267222, 2.689670139), (5.510096795, 2.613061996), (5.465515506, 2.538504273), (5.41634032, 2.466052922), (5.360615699, 2.3992182), (5.301614691, 2.335770341), (5.235567289, 2.279262071), (5.166552067, 2.225117883), (5.091412341, 2.177166881), (5.011908526, 2.133775469), (4.927537931, 2.095267608), (4.838001417, 2.061711489), (4.743415274, 2.031844209), (4.642927337, 2.007400135), (4.537375532, 1.986448484), (4.426373586, 1.970515295), (4.310060277, 1.959390224), (4.188409162, 1.953116354), (4.105547428, 1.952094705), (4.063339582, 1.9515743)],
                knots=[0, 0, 0, 0, 0.900570041, 1.788444861, 2.667795364, 3.545012114, 4.433698372, 5.332345486, 6.235991676, 7.164928091, 8.092777575, 9.015680987, 9.928493428, 10.842962589, 11.775229507, 12.714851019, 13.672254427, 14.652424454, 15.660007982, 16.709910502, 17.803296389, 18.945495772, 20.129342395, 21.366102753, 22.658353839, 24, 24, 24, 24], degree=3))
            add(Edge.make_bspline(
                [(4.063339582, 1.9515743), (4.002397965, 1.952569276), (3.883743193, 1.954506517), (3.711359118, 1.971846347), (3.549674268, 1.998386209), (3.398951853, 2.0369045), (3.259007654, 2.086353292), (3.129905498, 2.147263285), (3.012269836, 2.219998383), (2.90464369, 2.302794639), (2.808461007, 2.397160809), (2.721973345, 2.501141662), (2.646347447, 2.615673526), (2.58163302, 2.740577261), (2.526193974, 2.875177636), (2.480472858, 3.01953646), (2.446047261, 3.174342245), (2.431421007, 3.281307488), (2.423916505, 3.336189685)],
                knots=[0, 0, 0, 0, 1.217954099, 2.371385517, 3.459848295, 4.490682126, 5.476952527, 6.422732854, 7.338496285, 8.236688651, 9.131557988, 10.026443255, 10.935708282, 11.869506048, 12.834296687, 13.842423496, 14.892981177, 16, 16, 16, 16], degree=3))
        make_face()
    extrude(amount=-CUT_EXTRUDE4_DEPTH, mode=Mode.SUBTRACT)


solid = part.part
